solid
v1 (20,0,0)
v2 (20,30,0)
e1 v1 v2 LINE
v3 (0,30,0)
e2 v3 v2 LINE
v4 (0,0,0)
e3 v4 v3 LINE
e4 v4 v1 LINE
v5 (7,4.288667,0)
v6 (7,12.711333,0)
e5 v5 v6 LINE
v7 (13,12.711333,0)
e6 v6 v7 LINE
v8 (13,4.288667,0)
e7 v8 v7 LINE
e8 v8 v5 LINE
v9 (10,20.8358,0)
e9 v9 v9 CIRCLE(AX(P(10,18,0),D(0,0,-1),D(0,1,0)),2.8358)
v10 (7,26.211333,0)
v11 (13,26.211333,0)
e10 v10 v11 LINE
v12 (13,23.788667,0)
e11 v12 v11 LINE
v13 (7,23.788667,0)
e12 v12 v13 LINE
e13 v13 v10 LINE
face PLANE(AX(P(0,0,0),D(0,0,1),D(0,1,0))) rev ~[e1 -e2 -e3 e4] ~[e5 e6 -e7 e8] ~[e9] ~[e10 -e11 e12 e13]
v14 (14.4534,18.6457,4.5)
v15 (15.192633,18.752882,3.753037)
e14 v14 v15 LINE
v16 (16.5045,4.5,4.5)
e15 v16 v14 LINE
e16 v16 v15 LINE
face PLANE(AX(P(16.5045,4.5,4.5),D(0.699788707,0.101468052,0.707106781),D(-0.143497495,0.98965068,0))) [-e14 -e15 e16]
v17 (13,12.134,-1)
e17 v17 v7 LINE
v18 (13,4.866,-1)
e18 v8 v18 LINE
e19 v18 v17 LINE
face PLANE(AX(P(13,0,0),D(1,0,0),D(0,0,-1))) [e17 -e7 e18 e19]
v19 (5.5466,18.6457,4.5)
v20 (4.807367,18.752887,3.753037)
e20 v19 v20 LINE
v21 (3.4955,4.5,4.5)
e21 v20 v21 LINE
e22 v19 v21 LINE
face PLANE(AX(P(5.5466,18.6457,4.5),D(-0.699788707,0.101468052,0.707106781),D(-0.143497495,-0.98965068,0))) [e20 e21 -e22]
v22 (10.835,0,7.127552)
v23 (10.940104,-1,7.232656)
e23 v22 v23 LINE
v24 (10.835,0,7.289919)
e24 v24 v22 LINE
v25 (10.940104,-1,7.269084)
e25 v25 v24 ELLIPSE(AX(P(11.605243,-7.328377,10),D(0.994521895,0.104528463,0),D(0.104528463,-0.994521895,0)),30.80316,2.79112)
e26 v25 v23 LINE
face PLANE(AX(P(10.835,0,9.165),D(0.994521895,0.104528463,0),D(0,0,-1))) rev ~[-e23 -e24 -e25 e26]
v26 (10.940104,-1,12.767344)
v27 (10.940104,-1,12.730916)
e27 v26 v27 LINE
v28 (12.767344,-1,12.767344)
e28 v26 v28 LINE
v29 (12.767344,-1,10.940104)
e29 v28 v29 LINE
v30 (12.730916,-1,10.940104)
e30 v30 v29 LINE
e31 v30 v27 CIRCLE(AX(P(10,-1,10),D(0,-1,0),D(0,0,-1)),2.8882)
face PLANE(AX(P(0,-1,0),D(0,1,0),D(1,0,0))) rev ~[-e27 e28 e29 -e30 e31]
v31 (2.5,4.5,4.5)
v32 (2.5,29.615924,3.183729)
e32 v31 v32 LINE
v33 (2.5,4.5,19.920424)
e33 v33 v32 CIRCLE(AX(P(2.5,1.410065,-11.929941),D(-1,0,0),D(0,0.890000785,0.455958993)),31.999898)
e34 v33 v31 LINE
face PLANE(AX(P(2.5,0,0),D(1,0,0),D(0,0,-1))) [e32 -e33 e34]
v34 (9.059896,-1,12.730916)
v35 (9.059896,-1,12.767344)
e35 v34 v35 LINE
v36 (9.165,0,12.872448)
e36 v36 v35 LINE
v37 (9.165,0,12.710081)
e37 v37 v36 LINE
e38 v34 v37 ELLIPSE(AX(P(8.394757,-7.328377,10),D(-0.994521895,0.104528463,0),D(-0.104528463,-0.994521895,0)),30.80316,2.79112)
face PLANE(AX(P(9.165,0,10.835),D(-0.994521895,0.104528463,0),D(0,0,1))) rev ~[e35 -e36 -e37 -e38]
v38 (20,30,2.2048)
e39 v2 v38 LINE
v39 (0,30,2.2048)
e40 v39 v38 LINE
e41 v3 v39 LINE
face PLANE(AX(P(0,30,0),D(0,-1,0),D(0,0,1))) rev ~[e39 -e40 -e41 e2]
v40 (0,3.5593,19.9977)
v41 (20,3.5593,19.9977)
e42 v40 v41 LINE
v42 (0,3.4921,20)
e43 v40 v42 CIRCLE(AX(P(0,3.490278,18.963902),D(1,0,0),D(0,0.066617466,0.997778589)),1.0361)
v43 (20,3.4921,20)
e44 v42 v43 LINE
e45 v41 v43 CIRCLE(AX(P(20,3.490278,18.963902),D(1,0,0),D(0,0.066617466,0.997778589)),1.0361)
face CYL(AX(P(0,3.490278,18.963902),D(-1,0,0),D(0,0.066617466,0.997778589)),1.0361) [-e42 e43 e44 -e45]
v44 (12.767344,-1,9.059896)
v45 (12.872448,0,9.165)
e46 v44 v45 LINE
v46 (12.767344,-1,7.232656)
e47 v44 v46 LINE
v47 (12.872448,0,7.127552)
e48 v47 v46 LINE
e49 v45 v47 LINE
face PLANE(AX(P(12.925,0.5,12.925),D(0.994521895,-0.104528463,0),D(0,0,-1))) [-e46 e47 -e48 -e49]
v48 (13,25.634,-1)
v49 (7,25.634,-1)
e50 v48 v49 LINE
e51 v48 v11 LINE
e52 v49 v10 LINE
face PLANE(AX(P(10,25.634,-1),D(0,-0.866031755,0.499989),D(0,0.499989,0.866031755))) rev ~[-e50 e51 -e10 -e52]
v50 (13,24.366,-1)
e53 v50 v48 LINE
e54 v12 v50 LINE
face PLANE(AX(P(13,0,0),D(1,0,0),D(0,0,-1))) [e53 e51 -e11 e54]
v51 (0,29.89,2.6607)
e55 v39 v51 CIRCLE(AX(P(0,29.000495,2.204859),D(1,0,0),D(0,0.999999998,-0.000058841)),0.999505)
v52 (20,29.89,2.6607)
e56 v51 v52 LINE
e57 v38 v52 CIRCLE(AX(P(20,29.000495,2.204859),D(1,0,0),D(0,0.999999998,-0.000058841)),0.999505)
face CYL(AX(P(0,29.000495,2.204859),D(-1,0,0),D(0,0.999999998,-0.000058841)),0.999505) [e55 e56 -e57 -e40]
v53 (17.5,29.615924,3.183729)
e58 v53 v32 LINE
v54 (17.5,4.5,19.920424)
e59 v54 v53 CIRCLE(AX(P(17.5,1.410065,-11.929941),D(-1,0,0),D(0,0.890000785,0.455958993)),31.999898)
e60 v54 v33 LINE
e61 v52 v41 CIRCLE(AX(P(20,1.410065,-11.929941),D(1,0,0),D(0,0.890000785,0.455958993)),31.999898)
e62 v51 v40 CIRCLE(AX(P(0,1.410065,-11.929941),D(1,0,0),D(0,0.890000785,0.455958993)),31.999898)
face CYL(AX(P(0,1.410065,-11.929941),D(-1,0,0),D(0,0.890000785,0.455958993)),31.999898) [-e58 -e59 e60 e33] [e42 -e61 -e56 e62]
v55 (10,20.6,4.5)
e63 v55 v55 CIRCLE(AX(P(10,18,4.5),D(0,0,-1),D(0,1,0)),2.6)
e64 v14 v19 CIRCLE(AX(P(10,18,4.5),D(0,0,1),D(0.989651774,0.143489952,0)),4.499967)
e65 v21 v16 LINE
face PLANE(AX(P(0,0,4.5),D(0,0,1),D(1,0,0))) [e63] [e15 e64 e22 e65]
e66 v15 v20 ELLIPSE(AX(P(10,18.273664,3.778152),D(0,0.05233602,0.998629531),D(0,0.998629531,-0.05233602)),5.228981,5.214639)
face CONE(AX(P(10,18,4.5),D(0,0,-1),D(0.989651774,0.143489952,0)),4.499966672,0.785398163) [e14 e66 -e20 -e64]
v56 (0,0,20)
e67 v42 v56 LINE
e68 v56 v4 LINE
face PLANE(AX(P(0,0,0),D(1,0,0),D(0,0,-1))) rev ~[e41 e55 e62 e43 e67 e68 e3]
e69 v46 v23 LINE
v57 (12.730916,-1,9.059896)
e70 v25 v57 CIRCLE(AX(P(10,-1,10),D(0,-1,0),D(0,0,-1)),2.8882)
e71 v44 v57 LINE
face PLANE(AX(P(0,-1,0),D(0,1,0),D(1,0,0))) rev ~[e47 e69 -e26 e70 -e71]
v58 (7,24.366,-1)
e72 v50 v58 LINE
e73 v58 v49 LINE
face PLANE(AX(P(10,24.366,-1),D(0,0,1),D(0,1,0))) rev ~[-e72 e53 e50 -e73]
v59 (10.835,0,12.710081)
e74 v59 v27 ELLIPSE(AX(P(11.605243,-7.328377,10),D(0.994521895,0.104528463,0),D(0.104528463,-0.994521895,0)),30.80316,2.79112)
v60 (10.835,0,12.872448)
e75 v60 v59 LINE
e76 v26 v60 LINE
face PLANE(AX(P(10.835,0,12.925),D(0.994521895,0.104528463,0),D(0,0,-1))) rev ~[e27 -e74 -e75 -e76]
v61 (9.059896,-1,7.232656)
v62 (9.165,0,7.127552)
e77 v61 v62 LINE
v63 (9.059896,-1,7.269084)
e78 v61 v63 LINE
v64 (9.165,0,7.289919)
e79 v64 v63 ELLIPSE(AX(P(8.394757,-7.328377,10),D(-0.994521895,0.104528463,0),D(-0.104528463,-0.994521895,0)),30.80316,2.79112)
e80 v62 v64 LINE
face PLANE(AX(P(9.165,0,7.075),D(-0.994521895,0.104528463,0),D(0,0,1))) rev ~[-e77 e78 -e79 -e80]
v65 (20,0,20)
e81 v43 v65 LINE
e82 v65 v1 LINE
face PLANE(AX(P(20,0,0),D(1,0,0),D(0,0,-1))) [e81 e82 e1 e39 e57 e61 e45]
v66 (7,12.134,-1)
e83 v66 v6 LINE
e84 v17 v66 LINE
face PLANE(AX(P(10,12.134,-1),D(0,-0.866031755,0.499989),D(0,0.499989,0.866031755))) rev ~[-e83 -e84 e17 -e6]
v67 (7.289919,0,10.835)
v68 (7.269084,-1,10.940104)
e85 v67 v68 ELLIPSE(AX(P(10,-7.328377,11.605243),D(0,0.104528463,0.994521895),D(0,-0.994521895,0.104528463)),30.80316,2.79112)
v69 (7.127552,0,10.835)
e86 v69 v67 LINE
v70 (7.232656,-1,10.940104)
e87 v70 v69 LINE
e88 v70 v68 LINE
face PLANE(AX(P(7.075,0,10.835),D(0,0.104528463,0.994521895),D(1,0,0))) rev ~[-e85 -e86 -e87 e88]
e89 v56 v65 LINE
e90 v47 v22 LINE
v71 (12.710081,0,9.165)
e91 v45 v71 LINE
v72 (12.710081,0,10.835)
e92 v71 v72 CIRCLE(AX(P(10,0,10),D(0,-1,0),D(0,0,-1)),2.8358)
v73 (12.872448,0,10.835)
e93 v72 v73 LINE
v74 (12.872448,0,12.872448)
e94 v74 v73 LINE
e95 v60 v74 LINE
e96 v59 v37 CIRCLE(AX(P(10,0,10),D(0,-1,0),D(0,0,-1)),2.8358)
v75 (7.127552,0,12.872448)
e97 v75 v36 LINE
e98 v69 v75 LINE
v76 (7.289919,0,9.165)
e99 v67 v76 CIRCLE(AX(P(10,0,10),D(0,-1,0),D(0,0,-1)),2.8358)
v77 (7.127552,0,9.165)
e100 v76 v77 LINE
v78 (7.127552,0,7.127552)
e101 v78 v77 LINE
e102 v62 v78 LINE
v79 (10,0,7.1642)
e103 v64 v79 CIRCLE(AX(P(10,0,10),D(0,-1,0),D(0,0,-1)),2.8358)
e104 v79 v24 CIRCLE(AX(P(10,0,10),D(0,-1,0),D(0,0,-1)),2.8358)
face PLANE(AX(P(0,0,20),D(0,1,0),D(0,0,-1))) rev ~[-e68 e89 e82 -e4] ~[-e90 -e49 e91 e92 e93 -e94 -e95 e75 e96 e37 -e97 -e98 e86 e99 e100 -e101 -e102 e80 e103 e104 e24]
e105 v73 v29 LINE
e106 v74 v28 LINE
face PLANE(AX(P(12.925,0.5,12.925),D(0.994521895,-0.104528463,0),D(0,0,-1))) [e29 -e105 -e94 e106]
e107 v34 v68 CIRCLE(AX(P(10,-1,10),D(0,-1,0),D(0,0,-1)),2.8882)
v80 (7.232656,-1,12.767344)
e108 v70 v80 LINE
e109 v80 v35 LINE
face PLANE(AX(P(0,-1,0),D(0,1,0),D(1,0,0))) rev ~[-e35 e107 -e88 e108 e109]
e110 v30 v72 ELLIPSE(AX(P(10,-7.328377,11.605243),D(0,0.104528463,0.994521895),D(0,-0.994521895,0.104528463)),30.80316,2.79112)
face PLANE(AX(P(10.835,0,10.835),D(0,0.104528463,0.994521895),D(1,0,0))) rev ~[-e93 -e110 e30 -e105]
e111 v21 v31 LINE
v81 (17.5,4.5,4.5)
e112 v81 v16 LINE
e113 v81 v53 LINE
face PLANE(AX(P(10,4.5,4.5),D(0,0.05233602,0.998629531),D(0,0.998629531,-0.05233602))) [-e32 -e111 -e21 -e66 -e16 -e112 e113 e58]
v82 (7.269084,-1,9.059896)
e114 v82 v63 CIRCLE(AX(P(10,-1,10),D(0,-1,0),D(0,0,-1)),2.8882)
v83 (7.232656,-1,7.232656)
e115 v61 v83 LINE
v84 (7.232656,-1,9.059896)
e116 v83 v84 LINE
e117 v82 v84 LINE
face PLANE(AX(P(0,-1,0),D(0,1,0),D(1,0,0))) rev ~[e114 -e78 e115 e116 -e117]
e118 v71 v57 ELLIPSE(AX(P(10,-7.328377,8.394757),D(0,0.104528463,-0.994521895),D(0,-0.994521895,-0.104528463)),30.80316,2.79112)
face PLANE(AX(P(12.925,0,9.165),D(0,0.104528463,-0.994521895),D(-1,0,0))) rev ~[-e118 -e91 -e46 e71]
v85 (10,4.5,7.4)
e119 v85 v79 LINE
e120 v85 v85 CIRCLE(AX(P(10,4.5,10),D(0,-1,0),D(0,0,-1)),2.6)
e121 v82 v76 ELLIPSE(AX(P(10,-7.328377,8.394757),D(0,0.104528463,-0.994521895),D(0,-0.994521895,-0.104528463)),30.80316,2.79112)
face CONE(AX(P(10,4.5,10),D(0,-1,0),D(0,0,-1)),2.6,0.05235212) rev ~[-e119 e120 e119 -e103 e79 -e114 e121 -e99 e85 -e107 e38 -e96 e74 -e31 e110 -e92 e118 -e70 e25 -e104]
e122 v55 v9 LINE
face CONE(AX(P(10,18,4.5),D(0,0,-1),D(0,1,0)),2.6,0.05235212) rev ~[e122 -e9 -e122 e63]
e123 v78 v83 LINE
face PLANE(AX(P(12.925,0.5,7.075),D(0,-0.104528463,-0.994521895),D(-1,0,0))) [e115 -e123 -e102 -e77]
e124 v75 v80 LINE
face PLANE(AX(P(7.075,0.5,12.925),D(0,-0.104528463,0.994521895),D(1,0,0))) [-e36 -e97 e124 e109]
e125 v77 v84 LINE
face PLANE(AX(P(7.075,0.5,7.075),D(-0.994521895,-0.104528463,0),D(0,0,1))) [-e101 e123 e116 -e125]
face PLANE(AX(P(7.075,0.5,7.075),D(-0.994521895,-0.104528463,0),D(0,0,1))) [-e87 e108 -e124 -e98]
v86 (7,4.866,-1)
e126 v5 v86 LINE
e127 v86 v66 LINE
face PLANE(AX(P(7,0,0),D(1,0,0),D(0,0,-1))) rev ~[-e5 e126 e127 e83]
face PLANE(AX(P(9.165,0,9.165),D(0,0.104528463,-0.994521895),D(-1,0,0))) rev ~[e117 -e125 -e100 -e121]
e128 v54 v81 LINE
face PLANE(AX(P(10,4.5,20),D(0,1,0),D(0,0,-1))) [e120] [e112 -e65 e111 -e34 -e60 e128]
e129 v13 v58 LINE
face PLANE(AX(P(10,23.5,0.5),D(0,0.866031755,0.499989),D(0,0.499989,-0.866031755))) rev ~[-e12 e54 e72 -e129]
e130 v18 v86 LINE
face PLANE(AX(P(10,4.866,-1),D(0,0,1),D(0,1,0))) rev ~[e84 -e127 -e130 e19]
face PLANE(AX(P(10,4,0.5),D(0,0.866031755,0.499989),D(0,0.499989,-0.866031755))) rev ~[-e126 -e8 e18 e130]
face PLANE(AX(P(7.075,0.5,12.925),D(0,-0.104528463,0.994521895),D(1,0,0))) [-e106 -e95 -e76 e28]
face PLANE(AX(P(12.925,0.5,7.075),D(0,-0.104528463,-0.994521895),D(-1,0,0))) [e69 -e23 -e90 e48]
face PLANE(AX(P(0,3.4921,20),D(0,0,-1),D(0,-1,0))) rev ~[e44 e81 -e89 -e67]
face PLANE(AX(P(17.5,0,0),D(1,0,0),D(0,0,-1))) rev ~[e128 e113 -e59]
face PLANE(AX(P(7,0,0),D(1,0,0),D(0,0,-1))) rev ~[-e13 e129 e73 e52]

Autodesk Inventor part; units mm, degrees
sketch "Sketch_1" plane through (0, 0, 0) normal (1, 0, 0) x (0, 0, -1)
  line L0 (-20, 3.4921) -> (-20, 0)
  line L1 (-20, 0) -> (0, 0)
  line L2 (0, 0) -> (0, 30)
  line L3 (0, 30) -> (-2.2048, 30)
  arc A0 (-2.2048, 30) -> (-2.6607, 29.89) centre (-2.2048, 29) ccw
  arc A1 (-2.6607, 29.89) -> (-19.9977, 3.5593) centre (11.93, 1.41) ccw
  arc A2 (-19.9977, 3.5593) -> (-20, 3.4921) centre (-19, 3.4921) ccw
extrude "Extrusion1" add sketch "Sketch_1" along normal blind 20
sketch "Sketch_2" plane through (10, 0, 0) normal (1, 0, 0) x (0, 0, -1)
  line L0 (-20, 30) -> (-20, 4.5)
  line L1 (-20, 4.5) -> (-4.5, 4.5)
  line L2 (-4.5, 4.5) -> (-3.1636, 30)
  line L3 (-3.1636, 30) -> (-20, 30)
extrude "Extrusion2" cut sketch "Sketch_2" along normal mid plane 15
sketch "Sketch_5" plane through (10, 0, 0) normal (1, 0, 0) x (0, 0, -1)
  line L0 (-0.5, 26.5) -> (-0.5, 23.5)
  line L1 (-0.5, 23.5) -> (1, 24.366)
  line L2 (1, 24.366) -> (1, 25.634)
  line L3 (1, 25.634) -> (-0.5, 26.5)
extrude "Extrusion3" add sketch "Sketch_5" along normal mid plane 6
sketch "Sketch_6" plane through (10, 0, 0) normal (1, 0, 0) x (0, 0, -1)
  line L0 (-0.5, 13) -> (-0.5, 4)
  line L1 (-0.5, 4) -> (1, 4.866)
  line L2 (1, 4.866) -> (1, 12.134)
  line L3 (1, 12.134) -> (-0.5, 13)
extrude "Extrusion4" add sketch "Sketch_6" along normal mid plane 6
sketch "Sketch_3" plane through (0, 0, 4.5) normal (0, 0, 1) x (1, 0, 0)
  line L0 (3.4955, 4.5) -> (16.5045, 4.5)
  line L1 (16.5045, 4.5) -> (14.4534, 18.6457)
  arc A0 (14.4534, 18.6457) -> (5.5466, 18.6457) centre (10, 18) ccw
  line L2 (5.5466, 18.6457) -> (3.4955, 4.5)
extrude "Extrusion5" add sketch "Sketch_3" against normal blind 2 draft 45
sketch "Sketch_7" plane through (0, 0.5, 0) normal (0, 1, 0) x (1, 0, 0)
  line L0 (7.075, -12.925) -> (12.925, -12.925)
  line L1 (12.925, -12.925) -> (12.925, -7.075)
  line L2 (12.925, -7.075) -> (7.075, -7.075)
  line L3 (7.075, -7.075) -> (7.075, -12.925)
extrude "Extrusion6" add sketch "Sketch_7" against normal blind 1.5 draft -6
sketch "Sketch_9" plane through (0, 0, 0) normal (0, 1, 0) x (1, 0, 0)
  line L0 (7.075, -10.835) -> (9.165, -10.835)
  line L1 (9.165, -10.835) -> (9.165, -12.925)
  line L2 (9.165, -12.925) -> (10.835, -12.925)
  line L3 (10.835, -12.925) -> (10.835, -10.835)
  line L4 (10.835, -10.835) -> (12.925, -10.835)
  line L5 (12.925, -10.835) -> (12.925, -9.165)
  line L6 (12.925, -9.165) -> (10.835, -9.165)
  line L7 (10.835, -9.165) -> (10.835, -7.075)
  line L8 (10.835, -7.075) -> (9.165, -7.075)
  line L9 (9.165, -7.075) -> (9.165, -9.165)
  line L10 (9.165, -9.165) -> (7.075, -9.165)
  line L11 (7.075, -9.165) -> (7.075, -10.835)
extrude "Extrusion7" cut sketch "Sketch_9" against normal blind 1 draft 6
sketch "Sketch_4" plane through (10, 0, 0) normal (1, 0, 0) x (0, 0, -1)
  line L0 (0, 18) -> (-4.5, 18)
  line L1 (-4.5, 18) -> (-4.5, 20.6)
  line L2 (-4.5, 20.6) -> (0, 20.8358)
  line L3 (0, 20.8358) -> (0, 18)
  line L4 (0, 18) -> (-4.5, 18)
revolve "Revolution1" cut sketch "Sketch_4" angle 360 about axis through (10, 18, 0) along (0, 0, -1)
sketch "Sketch_8" plane through (10, 0, 0) normal (1, 0, 0) x (0, 0, -1)
  line L0 (-10, -1) -> (-10, 4.5)
  line L1 (-10, 4.5) -> (-7.4, 4.5)
  line L2 (-7.4, 4.5) -> (-7.1118, -1)
  line L3 (-7.1118, -1) -> (-10, -1)
  line L4 (-10, -1) -> (-10, 4.5)
revolve "Revolution2" cut sketch "Sketch_8" angle 360 about axis through (10, -1, 10) along (0, -1, 0)
ref_plane "to_bolt1_XY" through (10, 18, 4.5) normal (0, 0, 1) x (1, 0, 0)
ref_plane "to_bolt1_YZ" through (10, 18, 4.5) normal (1, 0, 0) x (0, 1, 0)
ref_plane "to_bolt1_ZX" through (10, 18, 4.5) normal (0, 1, 0) x (0, 0, 1)
ref_plane "to_bolt2_XY" through (10, 4.5, 10) normal (0, 1, 0) x (1, 0, 0)
ref_plane "to_bolt2_YZ" through (10, 4.5, 10) normal (1, 0, 0) x (0, 0, -1)
ref_plane "to_bolt2_ZX" through (10, 4.5, 10) normal (0, 0, -1) x (0, 1, 0)
ref_plane "to_nut1_XY" through (10, 18, -1) normal (0, 0, -1) x (0, 1, 0)
ref_plane "to_nut1_YZ" through (10, 18, -1) normal (0, 1, 0) x (1, 0, 0)
ref_plane "to_nut1_ZX" through (10, 18, -1) normal (1, 0, 0) x (0, 0, -1)
ref_plane "to_nut2_XY" through (10, -1, 10) normal (0, -1, 0) x (0, 0, -1)
ref_plane "to_nut2_YZ" through (10, -1, 10) normal (0, 0, -1) x (1, 0, 0)
ref_plane "to_nut2_ZX" through (10, -1, 10) normal (1, 0, 0) x (0, -1, 0)
properties part number "HBLFSNF5_b"
